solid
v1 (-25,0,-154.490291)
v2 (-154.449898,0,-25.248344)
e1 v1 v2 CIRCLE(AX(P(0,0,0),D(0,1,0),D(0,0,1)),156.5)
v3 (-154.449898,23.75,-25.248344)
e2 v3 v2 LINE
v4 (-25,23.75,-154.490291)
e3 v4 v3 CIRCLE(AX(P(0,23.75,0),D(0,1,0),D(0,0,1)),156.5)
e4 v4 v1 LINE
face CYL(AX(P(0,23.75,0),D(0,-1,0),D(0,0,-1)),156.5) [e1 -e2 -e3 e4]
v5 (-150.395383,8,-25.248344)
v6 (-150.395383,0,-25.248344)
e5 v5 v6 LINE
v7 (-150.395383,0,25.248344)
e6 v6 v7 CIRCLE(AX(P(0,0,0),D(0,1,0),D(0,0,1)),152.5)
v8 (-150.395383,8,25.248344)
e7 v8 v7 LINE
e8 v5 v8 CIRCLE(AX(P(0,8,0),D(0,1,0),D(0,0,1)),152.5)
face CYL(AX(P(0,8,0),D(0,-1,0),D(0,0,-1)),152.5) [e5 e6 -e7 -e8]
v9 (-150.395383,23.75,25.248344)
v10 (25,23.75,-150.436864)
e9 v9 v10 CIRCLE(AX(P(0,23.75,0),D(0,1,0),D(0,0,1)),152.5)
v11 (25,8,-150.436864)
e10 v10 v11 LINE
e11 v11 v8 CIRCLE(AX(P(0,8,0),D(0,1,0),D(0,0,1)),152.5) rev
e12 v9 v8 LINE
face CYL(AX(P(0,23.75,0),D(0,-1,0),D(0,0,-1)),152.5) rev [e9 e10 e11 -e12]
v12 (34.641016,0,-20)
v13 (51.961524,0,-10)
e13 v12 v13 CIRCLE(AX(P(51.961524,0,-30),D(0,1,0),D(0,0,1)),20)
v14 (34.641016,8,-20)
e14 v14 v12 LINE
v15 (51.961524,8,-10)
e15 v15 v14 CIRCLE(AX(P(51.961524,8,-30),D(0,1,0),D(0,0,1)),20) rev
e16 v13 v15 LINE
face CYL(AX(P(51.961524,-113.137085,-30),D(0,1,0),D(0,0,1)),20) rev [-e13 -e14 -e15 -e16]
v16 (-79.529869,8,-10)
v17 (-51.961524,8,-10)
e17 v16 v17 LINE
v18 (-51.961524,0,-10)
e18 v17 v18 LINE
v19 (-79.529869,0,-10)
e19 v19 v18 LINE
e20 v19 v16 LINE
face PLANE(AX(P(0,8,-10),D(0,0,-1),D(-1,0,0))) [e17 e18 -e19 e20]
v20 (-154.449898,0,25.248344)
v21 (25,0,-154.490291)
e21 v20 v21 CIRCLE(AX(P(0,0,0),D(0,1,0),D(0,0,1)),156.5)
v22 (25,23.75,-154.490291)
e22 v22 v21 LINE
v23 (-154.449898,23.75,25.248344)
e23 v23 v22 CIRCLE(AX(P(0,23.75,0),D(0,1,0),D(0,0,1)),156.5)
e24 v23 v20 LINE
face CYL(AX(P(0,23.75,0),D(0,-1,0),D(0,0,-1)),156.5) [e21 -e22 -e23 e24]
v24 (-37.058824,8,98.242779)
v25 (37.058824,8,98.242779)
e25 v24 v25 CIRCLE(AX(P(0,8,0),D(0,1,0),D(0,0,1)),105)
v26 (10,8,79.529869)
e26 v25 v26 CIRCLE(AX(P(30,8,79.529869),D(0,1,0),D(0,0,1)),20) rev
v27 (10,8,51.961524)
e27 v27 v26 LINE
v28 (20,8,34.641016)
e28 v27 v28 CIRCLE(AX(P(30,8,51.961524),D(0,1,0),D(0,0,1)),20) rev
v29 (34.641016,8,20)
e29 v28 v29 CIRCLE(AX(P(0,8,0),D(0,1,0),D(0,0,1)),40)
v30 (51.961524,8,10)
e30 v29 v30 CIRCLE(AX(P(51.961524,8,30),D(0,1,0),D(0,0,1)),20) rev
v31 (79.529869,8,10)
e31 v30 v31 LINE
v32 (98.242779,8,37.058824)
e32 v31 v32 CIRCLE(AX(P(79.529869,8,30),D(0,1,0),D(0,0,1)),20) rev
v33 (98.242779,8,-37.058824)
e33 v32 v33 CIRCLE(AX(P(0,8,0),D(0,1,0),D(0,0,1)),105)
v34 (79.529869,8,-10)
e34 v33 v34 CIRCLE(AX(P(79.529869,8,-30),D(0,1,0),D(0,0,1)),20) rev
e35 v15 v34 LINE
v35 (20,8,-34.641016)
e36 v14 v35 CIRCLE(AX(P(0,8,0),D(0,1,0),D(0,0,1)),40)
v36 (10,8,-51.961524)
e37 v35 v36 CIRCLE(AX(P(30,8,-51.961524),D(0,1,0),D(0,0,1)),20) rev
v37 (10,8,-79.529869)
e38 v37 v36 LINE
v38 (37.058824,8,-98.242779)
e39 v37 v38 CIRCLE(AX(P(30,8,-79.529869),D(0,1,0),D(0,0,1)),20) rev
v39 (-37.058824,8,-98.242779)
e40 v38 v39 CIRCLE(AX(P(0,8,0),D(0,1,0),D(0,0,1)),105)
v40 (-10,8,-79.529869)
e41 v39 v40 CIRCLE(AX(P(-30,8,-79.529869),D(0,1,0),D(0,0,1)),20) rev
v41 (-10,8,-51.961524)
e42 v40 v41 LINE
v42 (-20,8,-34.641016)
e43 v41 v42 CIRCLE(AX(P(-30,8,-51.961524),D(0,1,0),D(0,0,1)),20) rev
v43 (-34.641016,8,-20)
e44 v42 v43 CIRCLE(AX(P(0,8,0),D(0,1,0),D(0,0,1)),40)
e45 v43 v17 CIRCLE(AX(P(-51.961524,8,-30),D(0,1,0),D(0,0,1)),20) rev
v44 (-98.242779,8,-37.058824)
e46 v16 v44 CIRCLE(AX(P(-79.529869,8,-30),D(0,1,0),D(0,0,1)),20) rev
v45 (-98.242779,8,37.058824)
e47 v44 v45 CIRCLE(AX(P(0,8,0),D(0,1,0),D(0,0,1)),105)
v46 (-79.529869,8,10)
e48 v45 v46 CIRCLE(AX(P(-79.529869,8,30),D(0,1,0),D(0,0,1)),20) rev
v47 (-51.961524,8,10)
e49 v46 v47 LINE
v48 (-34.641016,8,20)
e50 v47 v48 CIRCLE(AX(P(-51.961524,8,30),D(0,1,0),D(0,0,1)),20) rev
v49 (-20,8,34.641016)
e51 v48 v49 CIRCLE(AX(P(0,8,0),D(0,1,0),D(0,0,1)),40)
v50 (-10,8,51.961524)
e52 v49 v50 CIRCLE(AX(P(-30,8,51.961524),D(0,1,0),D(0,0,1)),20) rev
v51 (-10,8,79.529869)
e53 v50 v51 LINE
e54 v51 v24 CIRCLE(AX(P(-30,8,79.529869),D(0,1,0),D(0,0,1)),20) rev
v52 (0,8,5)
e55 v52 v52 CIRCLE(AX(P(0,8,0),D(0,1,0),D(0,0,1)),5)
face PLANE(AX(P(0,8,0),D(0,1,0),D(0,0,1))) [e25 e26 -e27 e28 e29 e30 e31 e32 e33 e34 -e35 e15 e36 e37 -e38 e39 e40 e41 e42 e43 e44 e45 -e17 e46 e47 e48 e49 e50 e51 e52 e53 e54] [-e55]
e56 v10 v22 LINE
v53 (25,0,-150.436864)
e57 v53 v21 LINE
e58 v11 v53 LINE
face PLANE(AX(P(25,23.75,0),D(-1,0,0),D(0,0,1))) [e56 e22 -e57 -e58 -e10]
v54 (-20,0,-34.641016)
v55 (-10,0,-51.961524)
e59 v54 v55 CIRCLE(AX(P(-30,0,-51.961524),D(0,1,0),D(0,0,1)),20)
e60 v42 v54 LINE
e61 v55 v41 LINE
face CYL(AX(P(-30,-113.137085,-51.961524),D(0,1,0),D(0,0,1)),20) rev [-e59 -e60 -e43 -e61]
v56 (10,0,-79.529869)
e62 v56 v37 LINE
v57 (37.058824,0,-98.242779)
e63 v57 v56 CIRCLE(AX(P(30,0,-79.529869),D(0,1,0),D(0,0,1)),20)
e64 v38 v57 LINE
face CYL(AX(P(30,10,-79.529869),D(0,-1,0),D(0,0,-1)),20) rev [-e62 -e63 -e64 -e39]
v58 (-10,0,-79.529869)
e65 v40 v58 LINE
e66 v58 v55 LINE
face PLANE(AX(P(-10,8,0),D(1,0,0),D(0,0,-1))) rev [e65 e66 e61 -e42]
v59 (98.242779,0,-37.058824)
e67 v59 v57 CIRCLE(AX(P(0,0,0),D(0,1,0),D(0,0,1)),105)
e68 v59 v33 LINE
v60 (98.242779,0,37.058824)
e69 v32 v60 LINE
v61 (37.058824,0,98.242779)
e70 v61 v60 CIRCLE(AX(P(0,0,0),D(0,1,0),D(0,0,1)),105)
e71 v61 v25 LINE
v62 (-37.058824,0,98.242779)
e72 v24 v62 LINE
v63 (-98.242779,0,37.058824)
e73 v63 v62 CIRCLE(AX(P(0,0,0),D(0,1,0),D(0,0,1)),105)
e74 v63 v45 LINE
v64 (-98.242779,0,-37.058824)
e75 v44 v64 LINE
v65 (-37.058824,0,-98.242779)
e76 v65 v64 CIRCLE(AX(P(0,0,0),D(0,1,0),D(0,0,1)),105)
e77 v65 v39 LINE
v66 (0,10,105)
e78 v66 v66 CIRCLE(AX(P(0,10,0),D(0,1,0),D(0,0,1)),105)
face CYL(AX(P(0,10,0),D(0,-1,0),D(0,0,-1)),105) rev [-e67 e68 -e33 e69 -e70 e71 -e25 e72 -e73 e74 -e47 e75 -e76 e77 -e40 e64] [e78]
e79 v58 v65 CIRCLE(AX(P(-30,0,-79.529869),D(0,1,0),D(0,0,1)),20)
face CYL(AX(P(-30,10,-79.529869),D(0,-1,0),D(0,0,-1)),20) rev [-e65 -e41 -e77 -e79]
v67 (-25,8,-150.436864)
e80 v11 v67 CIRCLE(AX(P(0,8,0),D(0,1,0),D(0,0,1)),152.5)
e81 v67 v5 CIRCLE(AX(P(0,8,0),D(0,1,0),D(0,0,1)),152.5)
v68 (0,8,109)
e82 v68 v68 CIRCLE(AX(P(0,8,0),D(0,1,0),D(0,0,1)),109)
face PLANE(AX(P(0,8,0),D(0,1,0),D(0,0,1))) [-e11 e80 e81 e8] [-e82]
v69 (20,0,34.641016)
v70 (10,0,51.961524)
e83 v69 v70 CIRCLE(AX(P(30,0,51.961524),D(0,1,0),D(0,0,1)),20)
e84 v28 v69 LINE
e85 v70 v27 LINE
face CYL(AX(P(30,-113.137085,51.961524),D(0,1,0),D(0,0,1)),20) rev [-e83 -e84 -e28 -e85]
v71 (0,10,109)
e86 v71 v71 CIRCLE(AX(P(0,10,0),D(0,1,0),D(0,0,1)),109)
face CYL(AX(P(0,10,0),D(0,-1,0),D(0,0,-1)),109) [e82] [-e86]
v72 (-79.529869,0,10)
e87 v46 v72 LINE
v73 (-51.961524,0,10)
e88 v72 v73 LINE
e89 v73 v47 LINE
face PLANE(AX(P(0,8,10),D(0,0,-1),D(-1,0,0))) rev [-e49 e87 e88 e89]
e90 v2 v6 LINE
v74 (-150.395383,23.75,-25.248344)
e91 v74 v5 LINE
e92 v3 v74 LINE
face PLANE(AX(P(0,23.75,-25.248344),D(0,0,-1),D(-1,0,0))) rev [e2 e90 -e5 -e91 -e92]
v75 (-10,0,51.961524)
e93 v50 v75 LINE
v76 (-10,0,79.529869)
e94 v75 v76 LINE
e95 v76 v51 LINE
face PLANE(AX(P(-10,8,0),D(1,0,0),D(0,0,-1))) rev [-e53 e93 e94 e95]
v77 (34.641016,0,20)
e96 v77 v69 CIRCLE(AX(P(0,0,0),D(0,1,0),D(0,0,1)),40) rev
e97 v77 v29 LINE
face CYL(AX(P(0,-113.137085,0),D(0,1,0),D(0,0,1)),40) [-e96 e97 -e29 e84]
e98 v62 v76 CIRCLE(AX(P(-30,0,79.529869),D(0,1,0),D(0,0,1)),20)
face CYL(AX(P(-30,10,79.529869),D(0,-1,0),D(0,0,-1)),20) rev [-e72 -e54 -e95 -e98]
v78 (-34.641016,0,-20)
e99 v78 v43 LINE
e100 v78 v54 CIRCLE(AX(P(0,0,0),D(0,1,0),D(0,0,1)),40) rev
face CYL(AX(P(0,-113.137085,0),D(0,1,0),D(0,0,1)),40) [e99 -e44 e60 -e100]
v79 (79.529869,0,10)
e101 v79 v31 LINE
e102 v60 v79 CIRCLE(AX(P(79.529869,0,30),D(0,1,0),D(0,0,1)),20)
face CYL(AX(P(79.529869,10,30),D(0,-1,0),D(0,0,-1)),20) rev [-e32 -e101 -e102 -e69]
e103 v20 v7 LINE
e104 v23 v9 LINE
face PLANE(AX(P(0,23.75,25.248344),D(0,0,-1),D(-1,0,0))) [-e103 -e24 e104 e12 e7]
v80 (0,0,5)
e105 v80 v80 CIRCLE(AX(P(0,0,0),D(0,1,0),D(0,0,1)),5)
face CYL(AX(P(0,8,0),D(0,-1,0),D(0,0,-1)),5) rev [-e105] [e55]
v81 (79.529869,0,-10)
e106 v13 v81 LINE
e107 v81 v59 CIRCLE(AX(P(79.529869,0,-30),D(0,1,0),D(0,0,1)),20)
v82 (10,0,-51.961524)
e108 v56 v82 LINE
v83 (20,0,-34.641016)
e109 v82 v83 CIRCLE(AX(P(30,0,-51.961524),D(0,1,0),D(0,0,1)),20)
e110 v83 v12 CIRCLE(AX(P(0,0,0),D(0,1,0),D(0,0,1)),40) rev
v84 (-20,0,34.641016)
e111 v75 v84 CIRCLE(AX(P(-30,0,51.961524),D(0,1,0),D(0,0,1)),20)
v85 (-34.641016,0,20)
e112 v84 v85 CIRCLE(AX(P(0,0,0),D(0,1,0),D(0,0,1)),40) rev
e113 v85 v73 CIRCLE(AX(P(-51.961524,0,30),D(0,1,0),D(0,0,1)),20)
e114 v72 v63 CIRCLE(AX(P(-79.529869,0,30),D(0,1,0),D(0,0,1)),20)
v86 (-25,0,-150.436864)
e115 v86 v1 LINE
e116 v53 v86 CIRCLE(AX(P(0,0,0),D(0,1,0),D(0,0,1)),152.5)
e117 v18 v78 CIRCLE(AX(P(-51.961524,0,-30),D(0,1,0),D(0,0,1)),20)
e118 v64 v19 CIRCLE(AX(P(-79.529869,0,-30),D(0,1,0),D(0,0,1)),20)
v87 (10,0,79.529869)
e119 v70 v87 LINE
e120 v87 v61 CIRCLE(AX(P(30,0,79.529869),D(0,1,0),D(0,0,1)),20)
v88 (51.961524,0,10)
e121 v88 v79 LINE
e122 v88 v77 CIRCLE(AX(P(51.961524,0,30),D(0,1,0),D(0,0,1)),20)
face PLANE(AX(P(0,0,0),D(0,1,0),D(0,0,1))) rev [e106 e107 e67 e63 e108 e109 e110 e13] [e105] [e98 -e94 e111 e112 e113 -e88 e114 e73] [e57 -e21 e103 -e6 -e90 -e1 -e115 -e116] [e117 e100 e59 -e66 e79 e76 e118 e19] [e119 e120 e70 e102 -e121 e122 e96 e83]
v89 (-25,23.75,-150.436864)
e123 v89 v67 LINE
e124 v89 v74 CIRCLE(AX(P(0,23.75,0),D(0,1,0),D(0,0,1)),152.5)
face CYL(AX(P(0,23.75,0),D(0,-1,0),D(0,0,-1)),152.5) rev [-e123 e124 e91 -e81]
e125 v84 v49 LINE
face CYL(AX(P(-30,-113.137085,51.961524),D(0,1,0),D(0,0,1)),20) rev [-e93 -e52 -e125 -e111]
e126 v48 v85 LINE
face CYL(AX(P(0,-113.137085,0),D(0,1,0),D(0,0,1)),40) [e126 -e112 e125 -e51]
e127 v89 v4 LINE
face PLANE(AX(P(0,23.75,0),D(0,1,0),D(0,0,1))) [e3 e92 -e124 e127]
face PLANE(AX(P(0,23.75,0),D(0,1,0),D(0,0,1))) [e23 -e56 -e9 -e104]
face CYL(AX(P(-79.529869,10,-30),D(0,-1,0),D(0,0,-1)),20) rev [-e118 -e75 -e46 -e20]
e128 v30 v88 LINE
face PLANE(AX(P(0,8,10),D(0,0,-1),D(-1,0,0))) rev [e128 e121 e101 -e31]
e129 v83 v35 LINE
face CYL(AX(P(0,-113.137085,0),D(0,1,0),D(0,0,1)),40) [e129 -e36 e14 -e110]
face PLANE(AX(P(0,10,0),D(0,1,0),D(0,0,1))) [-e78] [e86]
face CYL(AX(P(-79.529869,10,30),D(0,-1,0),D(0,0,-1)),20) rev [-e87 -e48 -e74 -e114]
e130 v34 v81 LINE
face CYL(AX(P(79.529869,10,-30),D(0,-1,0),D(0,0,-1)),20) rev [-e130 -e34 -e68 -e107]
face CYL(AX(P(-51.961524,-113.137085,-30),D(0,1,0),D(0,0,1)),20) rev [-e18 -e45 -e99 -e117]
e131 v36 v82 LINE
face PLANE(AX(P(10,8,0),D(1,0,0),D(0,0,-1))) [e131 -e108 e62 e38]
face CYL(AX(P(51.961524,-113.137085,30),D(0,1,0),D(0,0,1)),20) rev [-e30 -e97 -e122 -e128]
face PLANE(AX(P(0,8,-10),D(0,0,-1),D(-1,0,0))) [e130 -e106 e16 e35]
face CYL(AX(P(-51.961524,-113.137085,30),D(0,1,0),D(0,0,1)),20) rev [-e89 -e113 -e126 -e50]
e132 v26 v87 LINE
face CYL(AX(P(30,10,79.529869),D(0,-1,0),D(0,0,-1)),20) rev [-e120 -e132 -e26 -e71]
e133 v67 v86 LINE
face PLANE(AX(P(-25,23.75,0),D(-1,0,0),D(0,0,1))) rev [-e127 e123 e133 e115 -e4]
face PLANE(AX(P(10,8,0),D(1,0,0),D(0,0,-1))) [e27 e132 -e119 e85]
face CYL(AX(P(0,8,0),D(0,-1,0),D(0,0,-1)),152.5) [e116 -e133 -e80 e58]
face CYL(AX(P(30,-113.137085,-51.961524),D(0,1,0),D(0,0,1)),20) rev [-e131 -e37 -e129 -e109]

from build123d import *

# Parameters (mm, degrees)
SKETCH1_R             = 5
BOSS_EXTRUDE3_DEPTH   = 8
SKETCH1_R_2           = 152.5
SKETCH1_R_3           = 109
BOSS_EXTRUDE3_2_DEPTH = 8
BOSS_EXTRUDE4_DEPTH   = 23.75
SKETCH1_9_R           = 109
SKETCH1_9_R_2         = 105
BOSS_EXTRUDE5_DEPTH   = 10
BOSS_EXTRUDE6_DEPTH   = 23.75
BOSS_EXTRUDE7_START   = -8
SKETCH2_R             = 40
SKETCH2_R_2           = 5
BOSS_EXTRUDE7_DEPTH   = 8
FILLET1_R             = 20


with BuildPart() as part:
    # Sketch1 → Boss-Extrude3 (new body)
    with BuildSketch(Plane(origin=(0, 0, 0), x_dir=(1, 0, 0), z_dir=(0, 1, 0))):
        with BuildLine():
            ThreePointArc((10, 104.522724802), (0, 105), (-10, 104.522724802))
            Line((-10, 104.522724802), (-10, 10))
            Line((-10, 10), (-104.522724802, 10))
            ThreePointArc((-104.522724802, 10), (-105, 0), (-104.522724802, -10))
            Line((-104.522724802, -10), (-10, -10))
            Line((-10, -10), (-10, -104.522724802))
            ThreePointArc((-10, -104.522724802), (0, -105), (10, -104.522724802))
            Line((10, -104.522724802), (10, -10))
            Line((10, -10), (104.522724802, -10))
            ThreePointArc((104.522724802, -10), (105, 0), (104.522724802, 10))
            Line((104.522724802, 10), (10, 10))
            Line((10, 10), (10, 104.522724802))
        make_face()
        with Locations(Location((0, 0, 0), (0, 0, 270))):
            Circle(SKETCH1_R, mode=Mode.SUBTRACT)
    extrude(amount=BOSS_EXTRUDE3_DEPTH)



with BuildPart() as body_2:
    # Sketch1 → Boss-Extrude3 2 (new body)
    with BuildSketch(Plane(origin=(0, 0, 0), x_dir=(1, 0, 0), z_dir=(0, 1, 0))):
        with Locations(Location((0, 0, 0), (0, 0, 270))):
            Circle(SKETCH1_R_2)
        with Locations(Location((0, 0, 0), (0, 0, 270))):
            Circle(SKETCH1_R_3, mode=Mode.SUBTRACT)
    extrude(amount=BOSS_EXTRUDE3_2_DEPTH)

    # Sketch1<8> → Boss-Extrude4 (add)
    with BuildSketch(Plane(origin=(0, 0, 0), x_dir=(1, 0, 0), z_dir=(0, 1, 0))):
        with BuildLine():
            Line((25, 154.490290957), (25, 150.436863833))
            ThreePointArc((25, 150.436863833), (116.337332787, 98.599568965), (152.5, 0))
            ThreePointArc((152.5, 0), (12.667954727, -151.972934837), (-150.395382597, -25.248344371))
            Line((-150.395382597, -25.248344371), (-154.44989837, -25.248344371))
            ThreePointArc((-154.44989837, -25.248344371), (110.751132294, -110.573218709), (25, 154.490290957))
        make_face()
    extrude(amount=BOSS_EXTRUDE4_DEPTH)


with BuildPart() as part_1:
    add(part.part)

    add(body_2.part)  # Boss-Extrude5 merges body 2
    # Sketch1<9> → Boss-Extrude5 (add)
    with BuildSketch(Plane(origin=(0, 0, 0), x_dir=(1, 0, 0), z_dir=(0, 1, 0))):
        with Locations(Location((0, 0, 0), (0, 0, 270))):
            Circle(SKETCH1_9_R)
        with Locations(Location((0, 0, 0), (0, 0, 84.5349762))):
            Circle(SKETCH1_9_R_2, mode=Mode.SUBTRACT)
    extrude(amount=BOSS_EXTRUDE5_DEPTH)

    # Sketch1<10> → Boss-Extrude6 (add)
    with BuildSketch(Plane(origin=(0, 0, 0), x_dir=(1, 0, 0), z_dir=(0, 1, 0))):
        with BuildLine():
            ThreePointArc((-150.395382597, 25.248344371), (-107.744727994, 107.922766781), (-25, 150.436863833))
            Line((-25, 150.436863833), (-25, 154.490290957))
            ThreePointArc((-25, 154.490290957), (-110.573218709, 110.751132294), (-154.44989837, 25.248344371))
            Line((-154.44989837, 25.248344371), (-150.395382597, 25.248344371))
        make_face()
    extrude(amount=BOSS_EXTRUDE6_DEPTH)

    # Sketch2 → Boss-Extrude7 (add)
    with BuildSketch(Plane(origin=(0, 8, 0), x_dir=(1, 0, 0), z_dir=(0, 1, 0)).offset(BOSS_EXTRUDE7_START)):
        Circle(SKETCH2_R)
        with Locations(Location((0, 0, 0), (0, 0, 270))):
            Circle(SKETCH2_R_2, mode=Mode.SUBTRACT)
    extrude(amount=BOSS_EXTRUDE7_DEPTH)

    # Fillet1
    # the kernel refuses this fillet: 20 mm, written as the material it adds along each edge
    with BuildSketch(Plane(origin=(-38.729833462, 8, 10), x_dir=(-1, 0, 0), z_dir=(0, -1, 0)), Plane(origin=(10, 8, 38.729833462), x_dir=(0, 0, 1), z_dir=(0, -1, 0)), Plane(origin=(-10, 8, -38.729833462), x_dir=(0, 0, -1), z_dir=(0, -1, 0)), Plane(origin=(38.729833462, 8, -10), x_dir=(1, 0, 0), z_dir=(0, -1, 0))) as fillet1_piece_1:
        with BuildLine():
            CenterArc((13.231690765, -20), FILLET1_R, 90, 60)
            ThreePointArc((-4.088817311, -10), (-1.705241726, -5.138679161), (0, 0))
            Line((0, 0), (13.231690765, 0))
        make_face()
    extrude(amount=8)
    with BuildSketch(Plane(origin=(-38.729833462, 8, -10), x_dir=(-1, 0, 0), z_dir=(0, -1, 0)), Plane(origin=(-10, 8, 38.729833462), x_dir=(0, 0, 1), z_dir=(0, -1, 0)), Plane(origin=(38.729833462, 8, 10), x_dir=(1, 0, 0), z_dir=(0, -1, 0)), Plane(origin=(10, 8, -38.729833462), x_dir=(0, 0, -1), z_dir=(0, -1, 0))) as fillet1_piece_2:
        with BuildLine():
            CenterArc((13.231690765, 20), FILLET1_R, 210, 60)
            ThreePointArc((-4.088817311, 10), (-1.705241726, 5.138679161), (0, 0))
            Line((0, 0), (13.231690765, 0))
        make_face()
    extrude(amount=8)
    with BuildSketch(Plane(origin=(-10, 0, -104.522724802), x_dir=(-0.974109622021504, 0, 0.22607619132744317), z_dir=(0, 1, 0)), Plane(origin=(104.522724802, 0, -10), x_dir=(-0.22607619132744408, 0, -0.9741096220215036), z_dir=(0, 1, 0)), Plane(origin=(10, 0, 104.522724802), x_dir=(0.9741096220215038, 0, -0.2260761913274436), z_dir=(0, 1, 0)), Plane(origin=(-104.522724802, 0, 10), x_dir=(0.22607619132744342, 0, 0.974109622021504), z_dir=(0, 1, 0))) as fillet1_piece_3:
        with BuildLine():
            CenterArc((25.13248218, 19.824257879), FILLET1_R, 166.933829853, 110.667316494)
            Line((5.65028974, 24.345781705), (0, 0))
            ThreePointArc((0, 0), (13.88900331, -0.922646137), (27.77800662, 0))
        make_face()
    extrude(amount=8)
    with BuildSketch(Plane(origin=(10, 0, -104.522724802), x_dir=(0.974109622021504, 0, 0.2260761913274437), z_dir=(0, 1, 0)), Plane(origin=(104.522724802, 0, 10), x_dir=(-0.22607619132744344, 0, 0.9741096220215039), z_dir=(0, 1, 0)), Plane(origin=(-10, 0, 104.522724802), x_dir=(-0.9741096220215041, 0, -0.22607619132744258), z_dir=(0, 1, 0)), Plane(origin=(-104.522724802, 0, -10), x_dir=(0.22607619132744275, 0, -0.9741096220215041), z_dir=(0, 1, 0))) as fillet1_piece_4:
        with BuildLine():
            CenterArc((25.13248218, -19.824257879), FILLET1_R, 82.398853653, 110.667316494)
            Line((5.65028974, -24.345781705), (0, 0))
            ThreePointArc((0, 0), (13.88900331, 0.922646137), (27.77800662, 0))
        make_face()
    extrude(amount=8)


solid = part_1.part
